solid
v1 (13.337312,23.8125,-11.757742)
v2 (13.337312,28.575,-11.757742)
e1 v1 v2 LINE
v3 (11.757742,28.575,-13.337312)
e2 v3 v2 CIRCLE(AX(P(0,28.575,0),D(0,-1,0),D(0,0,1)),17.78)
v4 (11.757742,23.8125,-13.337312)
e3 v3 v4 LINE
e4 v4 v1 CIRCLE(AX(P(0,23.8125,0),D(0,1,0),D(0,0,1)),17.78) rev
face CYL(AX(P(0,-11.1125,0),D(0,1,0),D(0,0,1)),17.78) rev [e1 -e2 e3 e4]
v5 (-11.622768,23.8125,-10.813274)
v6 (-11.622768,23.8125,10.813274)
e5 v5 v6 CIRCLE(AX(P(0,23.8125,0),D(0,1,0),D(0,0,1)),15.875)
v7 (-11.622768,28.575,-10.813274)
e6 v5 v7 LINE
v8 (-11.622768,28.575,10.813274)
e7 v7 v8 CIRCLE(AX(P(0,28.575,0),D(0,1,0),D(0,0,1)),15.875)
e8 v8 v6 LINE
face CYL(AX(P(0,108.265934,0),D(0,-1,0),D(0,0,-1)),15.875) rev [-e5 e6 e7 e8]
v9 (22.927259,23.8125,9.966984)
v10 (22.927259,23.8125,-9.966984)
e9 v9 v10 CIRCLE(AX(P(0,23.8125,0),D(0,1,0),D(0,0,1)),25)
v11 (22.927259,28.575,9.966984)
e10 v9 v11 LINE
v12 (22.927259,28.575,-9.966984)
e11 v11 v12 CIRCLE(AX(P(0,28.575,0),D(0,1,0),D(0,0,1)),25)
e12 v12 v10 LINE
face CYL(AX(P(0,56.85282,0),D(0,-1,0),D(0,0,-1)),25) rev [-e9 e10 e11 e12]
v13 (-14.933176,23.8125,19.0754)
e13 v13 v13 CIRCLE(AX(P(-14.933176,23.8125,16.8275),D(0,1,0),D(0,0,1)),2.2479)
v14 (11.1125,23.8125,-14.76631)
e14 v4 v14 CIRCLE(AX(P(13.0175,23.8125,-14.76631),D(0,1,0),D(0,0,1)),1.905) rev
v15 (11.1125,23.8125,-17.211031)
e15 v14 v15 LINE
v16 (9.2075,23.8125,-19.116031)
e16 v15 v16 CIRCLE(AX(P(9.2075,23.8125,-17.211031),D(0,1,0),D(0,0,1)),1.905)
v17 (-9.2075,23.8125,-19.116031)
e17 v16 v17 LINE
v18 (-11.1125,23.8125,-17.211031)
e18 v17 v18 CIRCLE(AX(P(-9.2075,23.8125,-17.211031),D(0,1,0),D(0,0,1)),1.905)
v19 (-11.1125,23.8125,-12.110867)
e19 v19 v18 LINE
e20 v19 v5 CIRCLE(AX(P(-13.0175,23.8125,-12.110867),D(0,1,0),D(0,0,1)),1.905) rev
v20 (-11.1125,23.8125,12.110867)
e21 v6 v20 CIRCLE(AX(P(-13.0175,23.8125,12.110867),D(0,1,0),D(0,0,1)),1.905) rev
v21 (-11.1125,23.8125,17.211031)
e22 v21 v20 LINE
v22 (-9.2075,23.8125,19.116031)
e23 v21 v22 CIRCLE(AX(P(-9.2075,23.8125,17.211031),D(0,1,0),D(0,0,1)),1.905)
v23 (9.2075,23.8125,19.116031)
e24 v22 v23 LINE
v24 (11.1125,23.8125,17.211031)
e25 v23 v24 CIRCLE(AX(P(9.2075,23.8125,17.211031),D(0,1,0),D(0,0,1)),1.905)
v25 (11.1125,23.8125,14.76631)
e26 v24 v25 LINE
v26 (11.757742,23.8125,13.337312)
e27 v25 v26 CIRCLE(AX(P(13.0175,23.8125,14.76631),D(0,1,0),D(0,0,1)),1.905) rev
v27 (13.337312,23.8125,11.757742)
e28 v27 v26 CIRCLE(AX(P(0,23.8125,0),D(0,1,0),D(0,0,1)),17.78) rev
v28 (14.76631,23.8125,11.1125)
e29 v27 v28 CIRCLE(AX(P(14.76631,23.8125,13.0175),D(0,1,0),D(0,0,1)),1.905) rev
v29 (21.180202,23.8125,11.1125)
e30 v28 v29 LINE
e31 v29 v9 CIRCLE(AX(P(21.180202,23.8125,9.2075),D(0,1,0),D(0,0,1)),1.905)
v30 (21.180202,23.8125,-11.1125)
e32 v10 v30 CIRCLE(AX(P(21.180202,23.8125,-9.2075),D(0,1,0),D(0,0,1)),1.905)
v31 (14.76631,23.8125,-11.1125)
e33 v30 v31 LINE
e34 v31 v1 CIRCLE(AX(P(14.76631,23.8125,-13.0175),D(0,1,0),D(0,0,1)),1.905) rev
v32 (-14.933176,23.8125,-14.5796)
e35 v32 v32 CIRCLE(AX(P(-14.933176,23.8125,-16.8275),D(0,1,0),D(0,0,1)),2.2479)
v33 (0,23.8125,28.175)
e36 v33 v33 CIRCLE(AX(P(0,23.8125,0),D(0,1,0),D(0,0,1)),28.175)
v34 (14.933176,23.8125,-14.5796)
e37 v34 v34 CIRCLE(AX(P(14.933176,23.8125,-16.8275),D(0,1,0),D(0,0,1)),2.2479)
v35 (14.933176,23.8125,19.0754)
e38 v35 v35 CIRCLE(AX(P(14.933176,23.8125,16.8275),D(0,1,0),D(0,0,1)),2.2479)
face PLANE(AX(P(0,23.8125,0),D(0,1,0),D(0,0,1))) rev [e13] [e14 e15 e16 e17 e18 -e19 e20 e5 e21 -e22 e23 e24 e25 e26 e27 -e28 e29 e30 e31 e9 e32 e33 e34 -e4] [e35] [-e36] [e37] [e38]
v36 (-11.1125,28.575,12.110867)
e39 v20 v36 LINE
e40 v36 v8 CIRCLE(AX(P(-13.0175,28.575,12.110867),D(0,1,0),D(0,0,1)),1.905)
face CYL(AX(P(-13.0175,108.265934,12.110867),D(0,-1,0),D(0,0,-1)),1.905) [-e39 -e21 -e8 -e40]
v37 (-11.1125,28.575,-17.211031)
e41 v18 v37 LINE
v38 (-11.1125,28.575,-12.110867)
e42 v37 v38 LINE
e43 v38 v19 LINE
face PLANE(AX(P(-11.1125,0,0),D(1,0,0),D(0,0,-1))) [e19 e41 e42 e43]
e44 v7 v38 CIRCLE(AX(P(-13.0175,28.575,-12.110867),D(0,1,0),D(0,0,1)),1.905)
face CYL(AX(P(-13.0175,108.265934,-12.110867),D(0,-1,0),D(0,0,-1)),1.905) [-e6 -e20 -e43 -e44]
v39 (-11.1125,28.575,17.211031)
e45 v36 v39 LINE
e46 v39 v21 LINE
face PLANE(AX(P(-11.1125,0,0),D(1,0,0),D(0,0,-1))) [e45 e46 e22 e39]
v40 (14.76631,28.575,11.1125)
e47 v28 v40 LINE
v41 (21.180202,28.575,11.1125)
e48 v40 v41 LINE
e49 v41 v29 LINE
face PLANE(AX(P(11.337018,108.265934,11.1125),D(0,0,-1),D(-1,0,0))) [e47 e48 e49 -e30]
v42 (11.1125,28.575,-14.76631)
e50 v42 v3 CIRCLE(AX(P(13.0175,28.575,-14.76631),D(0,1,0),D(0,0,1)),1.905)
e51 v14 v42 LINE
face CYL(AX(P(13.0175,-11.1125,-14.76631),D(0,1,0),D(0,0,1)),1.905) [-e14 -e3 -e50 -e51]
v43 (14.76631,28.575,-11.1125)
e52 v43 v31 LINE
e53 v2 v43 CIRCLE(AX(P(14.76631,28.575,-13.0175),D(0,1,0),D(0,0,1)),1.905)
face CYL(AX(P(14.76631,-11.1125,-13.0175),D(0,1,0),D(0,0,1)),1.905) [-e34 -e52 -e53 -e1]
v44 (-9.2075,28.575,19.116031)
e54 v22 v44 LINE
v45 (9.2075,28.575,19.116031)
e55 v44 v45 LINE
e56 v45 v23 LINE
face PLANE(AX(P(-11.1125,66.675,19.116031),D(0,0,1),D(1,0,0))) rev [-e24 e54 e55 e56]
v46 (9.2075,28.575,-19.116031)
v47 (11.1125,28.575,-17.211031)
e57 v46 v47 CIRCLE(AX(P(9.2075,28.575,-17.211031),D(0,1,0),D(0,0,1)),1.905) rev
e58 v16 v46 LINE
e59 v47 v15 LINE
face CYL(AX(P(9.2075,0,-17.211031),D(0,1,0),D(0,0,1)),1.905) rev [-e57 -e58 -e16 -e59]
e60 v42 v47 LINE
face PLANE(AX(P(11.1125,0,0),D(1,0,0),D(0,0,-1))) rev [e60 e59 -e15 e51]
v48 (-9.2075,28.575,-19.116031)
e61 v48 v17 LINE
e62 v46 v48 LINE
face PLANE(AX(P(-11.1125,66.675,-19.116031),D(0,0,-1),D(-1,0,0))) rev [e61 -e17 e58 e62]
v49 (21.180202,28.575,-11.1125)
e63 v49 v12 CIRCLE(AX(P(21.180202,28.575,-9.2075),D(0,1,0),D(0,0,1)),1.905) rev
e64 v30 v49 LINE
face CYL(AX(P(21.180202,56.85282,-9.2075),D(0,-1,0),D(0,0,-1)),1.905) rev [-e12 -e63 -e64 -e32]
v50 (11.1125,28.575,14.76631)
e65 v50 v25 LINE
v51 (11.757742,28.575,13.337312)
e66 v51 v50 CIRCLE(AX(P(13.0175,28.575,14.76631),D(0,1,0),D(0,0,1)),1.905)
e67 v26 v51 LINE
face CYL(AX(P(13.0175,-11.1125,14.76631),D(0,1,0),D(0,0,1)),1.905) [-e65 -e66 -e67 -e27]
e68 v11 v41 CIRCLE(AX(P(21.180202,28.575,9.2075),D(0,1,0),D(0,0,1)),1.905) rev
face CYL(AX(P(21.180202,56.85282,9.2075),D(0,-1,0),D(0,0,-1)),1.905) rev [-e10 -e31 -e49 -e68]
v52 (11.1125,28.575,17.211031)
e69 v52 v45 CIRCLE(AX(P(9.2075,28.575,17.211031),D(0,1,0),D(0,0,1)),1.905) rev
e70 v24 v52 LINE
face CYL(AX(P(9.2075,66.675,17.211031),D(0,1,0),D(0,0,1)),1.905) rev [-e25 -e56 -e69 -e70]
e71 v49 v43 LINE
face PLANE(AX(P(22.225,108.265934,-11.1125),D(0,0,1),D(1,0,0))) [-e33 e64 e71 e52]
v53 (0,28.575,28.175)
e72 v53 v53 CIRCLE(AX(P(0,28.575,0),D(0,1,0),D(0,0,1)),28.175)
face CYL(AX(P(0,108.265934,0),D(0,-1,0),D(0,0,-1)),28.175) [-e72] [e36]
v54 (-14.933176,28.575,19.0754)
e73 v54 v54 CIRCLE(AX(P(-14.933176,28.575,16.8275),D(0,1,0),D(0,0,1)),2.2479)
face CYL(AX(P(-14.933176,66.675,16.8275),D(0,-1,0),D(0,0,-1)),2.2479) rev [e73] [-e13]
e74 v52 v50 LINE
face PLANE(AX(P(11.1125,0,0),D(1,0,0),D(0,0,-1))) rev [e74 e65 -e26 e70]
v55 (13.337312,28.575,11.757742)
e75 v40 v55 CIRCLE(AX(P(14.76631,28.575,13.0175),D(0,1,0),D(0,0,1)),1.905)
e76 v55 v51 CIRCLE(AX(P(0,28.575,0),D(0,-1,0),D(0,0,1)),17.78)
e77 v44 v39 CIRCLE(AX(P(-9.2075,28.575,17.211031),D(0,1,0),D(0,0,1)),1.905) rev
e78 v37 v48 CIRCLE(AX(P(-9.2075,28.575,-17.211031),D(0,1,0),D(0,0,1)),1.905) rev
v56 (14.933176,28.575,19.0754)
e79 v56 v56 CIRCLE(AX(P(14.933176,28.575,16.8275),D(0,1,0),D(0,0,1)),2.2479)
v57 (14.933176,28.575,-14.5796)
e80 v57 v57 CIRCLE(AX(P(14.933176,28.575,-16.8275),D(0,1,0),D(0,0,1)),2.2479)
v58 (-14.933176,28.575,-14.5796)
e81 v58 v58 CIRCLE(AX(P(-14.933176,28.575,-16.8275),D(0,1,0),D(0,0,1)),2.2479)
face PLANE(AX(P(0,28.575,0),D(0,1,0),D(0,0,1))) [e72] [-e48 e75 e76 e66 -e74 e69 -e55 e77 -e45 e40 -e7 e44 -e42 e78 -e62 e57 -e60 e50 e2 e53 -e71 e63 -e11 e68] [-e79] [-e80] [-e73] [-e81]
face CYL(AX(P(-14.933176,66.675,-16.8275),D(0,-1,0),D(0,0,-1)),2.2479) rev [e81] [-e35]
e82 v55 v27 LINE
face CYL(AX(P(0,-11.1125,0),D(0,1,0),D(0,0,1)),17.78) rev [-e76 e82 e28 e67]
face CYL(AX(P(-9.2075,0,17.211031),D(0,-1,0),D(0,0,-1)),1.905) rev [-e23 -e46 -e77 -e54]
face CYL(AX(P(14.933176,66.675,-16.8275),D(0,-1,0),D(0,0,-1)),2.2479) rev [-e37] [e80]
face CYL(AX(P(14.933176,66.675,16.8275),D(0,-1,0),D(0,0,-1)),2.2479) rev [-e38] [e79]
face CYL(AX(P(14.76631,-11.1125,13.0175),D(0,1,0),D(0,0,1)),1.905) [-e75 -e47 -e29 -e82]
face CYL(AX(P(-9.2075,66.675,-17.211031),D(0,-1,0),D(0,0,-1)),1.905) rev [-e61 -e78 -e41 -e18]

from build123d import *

# Parameters (mm, degrees)
STOCK_DGT_START                               = 23.8125
STOCK_DGT_INSIDE_SWERVE_STRUCTURE_SM_2_R      = 28.175
STOCK_DGT_INSIDE_SWERVE_STRUCTURE_SM_2_R_2    = 2.2479
STOCK_DGT_INSIDE_SWERVE_STRUCTURE_SMALL_DEPTH = 4.7625
FILLET1_R                                     = 1.905


# Read off the part's stored shape, not the designer's step: Stock-DGT inside swerve structure Small Bearing-1
with BuildPart() as part:
    # Stock-DGT inside swerve structure Sm 2 → Stock-DGT inside swerve structure Small Bearing-1 (new body)
    with BuildSketch(Plane(origin=(0, 0, 0), x_dir=(1, 0, 0), z_dir=(0, 1, 0)).offset(STOCK_DGT_START)):
        Circle(STOCK_DGT_INSIDE_SWERVE_STRUCTURE_SM_2_R)
        with Locations((-14.933176064, -16.8275)):
            Circle(STOCK_DGT_INSIDE_SWERVE_STRUCTURE_SM_2_R_2, mode=Mode.SUBTRACT)
        with Locations((14.933176064, -16.8275)):
            Circle(STOCK_DGT_INSIDE_SWERVE_STRUCTURE_SM_2_R_2, mode=Mode.SUBTRACT)
        with Locations((-14.933176064, 16.8275)):
            Circle(STOCK_DGT_INSIDE_SWERVE_STRUCTURE_SM_2_R_2, mode=Mode.SUBTRACT)
        with BuildLine():
            ThreePointArc((11.1125, 13.879508051), (12.572358569, 12.572358569), (13.879508051, 11.1125))
            Line((13.879508051, 11.1125), (22.394471276, 11.1125))
            ThreePointArc((22.394471276, 11.1125), (25, 0), (22.394471276, -11.1125))
            Line((22.394471276, -11.1125), (13.879508051, -11.1125))
            ThreePointArc((13.879508051, -11.1125), (12.572358569, -12.572358569), (11.1125, -13.879508051))
            Line((11.1125, -13.879508051), (11.1125, -19.116031394))
            Line((11.1125, -19.116031394), (-11.1125, -19.116031394))
            Line((-11.1125, -19.116031394), (-11.1125, -11.33701763))
            ThreePointArc((-11.1125, -11.33701763), (-15.875, 0), (-11.1125, 11.33701763))
            Line((-11.1125, 11.33701763), (-11.1125, 19.116031394))
            Line((-11.1125, 19.116031394), (11.1125, 19.116031394))
            Line((11.1125, 19.116031394), (11.1125, 13.879508051))
        make_face(mode=Mode.SUBTRACT)
        with Locations((14.933176064, 16.8275)):
            Circle(STOCK_DGT_INSIDE_SWERVE_STRUCTURE_SM_2_R_2, mode=Mode.SUBTRACT)
    extrude(amount=STOCK_DGT_INSIDE_SWERVE_STRUCTURE_SMALL_DEPTH)

    # Fillet1
    fillet1_edges = [part.edges().sort_by_distance(p)[0] for p in [
        (22.394471276, 26.19375, 11.1125),
        (22.394471276, 26.19375, -11.1125),
        (11.1125, 26.19375, 13.879508051),
        (11.1125, 26.19375, -13.879508051),
        (13.879508051, 26.19375, -11.1125),
        (13.879508051, 26.19375, 11.1125),
        (-11.1125, 26.19375, -11.33701763),
        (-11.1125, 26.19375, 11.33701763),
        (11.1125, 26.19375, -19.116031394),
        (-11.1125, 26.19375, 19.116031394),
        (11.1125, 26.19375, 19.116031394),
        (-11.1125, 26.19375, -19.116031394),
    ]]
    fillet(fillet1_edges, radius=FILLET1_R)


solid = part.part
